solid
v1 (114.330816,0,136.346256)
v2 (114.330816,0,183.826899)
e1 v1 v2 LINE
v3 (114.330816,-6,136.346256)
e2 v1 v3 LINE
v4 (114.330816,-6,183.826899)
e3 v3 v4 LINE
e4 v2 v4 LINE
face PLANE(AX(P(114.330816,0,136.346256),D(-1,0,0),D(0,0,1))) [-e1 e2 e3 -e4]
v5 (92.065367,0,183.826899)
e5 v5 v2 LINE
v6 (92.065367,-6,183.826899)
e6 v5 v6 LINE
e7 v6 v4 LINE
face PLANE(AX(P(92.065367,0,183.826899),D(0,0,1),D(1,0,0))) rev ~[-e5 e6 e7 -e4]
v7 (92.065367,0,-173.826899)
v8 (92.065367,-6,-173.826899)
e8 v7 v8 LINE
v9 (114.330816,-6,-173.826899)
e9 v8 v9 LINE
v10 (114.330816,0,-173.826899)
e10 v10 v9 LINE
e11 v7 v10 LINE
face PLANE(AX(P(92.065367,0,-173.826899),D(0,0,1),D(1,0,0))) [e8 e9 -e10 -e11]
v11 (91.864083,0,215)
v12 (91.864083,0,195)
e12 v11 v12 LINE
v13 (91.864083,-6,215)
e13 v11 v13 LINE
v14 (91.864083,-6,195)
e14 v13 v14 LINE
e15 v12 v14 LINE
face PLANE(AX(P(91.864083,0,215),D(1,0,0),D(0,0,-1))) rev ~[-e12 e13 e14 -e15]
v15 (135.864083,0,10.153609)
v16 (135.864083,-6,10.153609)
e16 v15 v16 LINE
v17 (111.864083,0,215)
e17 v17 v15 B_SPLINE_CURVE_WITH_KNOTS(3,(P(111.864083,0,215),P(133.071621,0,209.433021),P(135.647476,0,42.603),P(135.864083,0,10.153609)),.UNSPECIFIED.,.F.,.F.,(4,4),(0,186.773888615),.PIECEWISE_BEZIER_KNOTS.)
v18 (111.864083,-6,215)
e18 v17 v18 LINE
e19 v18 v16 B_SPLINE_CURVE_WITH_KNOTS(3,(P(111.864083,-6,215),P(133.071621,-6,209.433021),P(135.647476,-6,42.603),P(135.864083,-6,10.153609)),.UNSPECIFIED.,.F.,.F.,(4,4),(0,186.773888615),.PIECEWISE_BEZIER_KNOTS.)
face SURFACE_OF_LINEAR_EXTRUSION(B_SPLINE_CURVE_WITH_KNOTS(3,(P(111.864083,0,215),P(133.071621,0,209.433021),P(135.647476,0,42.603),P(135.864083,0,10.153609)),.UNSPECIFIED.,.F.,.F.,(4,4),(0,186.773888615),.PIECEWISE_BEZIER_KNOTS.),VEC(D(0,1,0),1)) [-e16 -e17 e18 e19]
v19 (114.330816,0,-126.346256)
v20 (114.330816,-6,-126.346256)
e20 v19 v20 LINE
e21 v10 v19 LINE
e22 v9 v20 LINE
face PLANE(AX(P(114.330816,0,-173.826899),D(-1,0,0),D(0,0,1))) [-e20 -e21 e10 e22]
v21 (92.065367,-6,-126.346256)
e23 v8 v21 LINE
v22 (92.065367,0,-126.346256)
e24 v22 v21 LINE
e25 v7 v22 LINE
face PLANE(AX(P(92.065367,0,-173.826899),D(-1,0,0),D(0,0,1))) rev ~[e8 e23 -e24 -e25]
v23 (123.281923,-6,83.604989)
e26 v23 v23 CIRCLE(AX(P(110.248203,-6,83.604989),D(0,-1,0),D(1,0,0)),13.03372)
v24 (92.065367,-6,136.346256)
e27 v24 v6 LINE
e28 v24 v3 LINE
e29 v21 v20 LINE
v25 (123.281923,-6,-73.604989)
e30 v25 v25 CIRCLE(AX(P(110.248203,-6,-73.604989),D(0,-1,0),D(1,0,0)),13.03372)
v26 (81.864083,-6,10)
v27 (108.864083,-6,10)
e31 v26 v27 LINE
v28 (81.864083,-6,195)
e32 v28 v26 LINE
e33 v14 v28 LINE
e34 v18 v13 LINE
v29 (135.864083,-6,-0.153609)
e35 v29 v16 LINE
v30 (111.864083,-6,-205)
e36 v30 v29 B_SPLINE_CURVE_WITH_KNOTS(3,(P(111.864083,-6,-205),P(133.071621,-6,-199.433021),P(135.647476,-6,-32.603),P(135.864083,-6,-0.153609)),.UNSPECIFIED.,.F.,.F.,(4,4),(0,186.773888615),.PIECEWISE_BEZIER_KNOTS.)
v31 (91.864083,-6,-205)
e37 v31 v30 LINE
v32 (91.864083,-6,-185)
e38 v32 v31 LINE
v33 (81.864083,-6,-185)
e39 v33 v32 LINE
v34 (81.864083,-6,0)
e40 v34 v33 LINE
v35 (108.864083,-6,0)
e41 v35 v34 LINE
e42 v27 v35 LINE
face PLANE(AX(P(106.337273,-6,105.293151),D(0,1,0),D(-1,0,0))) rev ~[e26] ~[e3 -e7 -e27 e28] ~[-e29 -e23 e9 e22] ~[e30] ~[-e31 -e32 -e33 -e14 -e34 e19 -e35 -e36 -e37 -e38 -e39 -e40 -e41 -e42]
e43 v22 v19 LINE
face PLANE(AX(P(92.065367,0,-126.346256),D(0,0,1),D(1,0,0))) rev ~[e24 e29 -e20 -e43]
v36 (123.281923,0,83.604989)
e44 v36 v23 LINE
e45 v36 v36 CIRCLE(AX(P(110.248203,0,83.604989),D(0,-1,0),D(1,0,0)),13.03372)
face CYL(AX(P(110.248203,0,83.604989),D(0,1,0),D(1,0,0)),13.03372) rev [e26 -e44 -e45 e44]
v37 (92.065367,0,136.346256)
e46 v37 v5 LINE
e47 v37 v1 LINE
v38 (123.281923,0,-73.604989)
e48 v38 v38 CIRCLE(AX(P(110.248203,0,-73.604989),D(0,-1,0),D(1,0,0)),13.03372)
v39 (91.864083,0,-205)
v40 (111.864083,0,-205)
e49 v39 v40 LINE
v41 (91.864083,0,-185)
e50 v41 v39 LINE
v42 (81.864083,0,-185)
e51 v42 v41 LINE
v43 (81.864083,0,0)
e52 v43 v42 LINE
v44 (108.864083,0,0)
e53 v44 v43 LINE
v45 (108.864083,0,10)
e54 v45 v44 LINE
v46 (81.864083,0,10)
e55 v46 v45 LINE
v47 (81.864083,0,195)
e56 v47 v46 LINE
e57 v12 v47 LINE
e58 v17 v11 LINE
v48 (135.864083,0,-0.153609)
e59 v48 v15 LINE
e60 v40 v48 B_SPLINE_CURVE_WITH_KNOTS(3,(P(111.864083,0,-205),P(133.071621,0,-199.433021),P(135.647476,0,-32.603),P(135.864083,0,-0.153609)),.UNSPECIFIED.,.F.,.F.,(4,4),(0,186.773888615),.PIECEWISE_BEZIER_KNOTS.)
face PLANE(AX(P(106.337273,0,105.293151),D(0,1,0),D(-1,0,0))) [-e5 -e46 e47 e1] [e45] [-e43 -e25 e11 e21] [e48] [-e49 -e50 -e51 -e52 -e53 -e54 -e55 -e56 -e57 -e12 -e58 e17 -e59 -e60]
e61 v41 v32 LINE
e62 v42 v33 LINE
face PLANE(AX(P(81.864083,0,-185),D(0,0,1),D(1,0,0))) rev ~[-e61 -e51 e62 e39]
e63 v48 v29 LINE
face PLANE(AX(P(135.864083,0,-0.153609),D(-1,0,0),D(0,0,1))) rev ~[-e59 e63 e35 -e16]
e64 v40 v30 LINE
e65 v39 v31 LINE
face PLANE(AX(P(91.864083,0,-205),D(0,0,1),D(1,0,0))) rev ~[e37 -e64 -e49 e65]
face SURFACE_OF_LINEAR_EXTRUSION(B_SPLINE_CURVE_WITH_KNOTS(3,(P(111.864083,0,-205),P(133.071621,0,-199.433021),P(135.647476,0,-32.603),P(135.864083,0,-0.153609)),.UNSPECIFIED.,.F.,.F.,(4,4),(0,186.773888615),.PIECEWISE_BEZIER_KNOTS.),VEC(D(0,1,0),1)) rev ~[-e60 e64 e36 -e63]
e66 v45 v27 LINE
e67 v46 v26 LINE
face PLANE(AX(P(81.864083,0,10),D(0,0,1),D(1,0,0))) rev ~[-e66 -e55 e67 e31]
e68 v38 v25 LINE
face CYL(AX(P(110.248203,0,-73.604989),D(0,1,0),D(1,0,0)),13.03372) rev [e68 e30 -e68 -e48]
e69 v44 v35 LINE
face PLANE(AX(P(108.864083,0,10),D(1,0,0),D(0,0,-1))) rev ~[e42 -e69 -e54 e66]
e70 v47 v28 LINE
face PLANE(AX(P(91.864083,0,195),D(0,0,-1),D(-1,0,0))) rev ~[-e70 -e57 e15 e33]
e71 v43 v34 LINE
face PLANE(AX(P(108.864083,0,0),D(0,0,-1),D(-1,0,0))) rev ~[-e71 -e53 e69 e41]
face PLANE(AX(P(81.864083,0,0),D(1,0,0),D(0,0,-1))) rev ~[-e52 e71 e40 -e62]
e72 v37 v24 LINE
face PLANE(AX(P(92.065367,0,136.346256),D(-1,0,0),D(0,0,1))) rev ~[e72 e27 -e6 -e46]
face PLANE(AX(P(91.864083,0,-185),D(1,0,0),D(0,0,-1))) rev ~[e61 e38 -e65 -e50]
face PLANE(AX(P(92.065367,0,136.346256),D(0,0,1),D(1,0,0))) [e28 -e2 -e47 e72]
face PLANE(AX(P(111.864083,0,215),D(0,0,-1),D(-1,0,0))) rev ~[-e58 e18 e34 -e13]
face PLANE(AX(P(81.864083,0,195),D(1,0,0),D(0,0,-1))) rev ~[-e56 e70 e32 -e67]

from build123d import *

# Parameters (mm, degrees)
F0_W     = 22.2654491663
F0_H     = 47.4806427956
F0_R     = 13.033720186
F1_DEPTH = 6


# Not quite as in the source:
# - a feature names something its author has since deleted; it is built from what else it names


with BuildPart() as f1:
    # F0 (on Front) → F1 (new body)
    with BuildSketch(Plane.XZ):
        with BuildLine():
            add(Edge.make_bspline(
                [(111.8640829768, 215), (133.0716213469, 209.4330211779), (135.6474762559, 42.6029998371), (135.8640829768, 10.1536091521)],
                knots=[0, 0, 0, 0, 186.7738886147, 186.7738886147, 186.7738886147, 186.7738886147], degree=3))
            Line((111.8640829768, 215), (91.8640829768, 215))
            Line((91.8640829768, 215), (91.8640829768, 195))
            Line((91.8640829768, 195), (81.8640829768, 195))
            Line((81.8640829768, 195), (81.8640829768, 10))
            Line((81.8640829768, 10), (108.8640829768, 10))
            Line((108.8640829768, 10), (108.8640829768, 5))
            Line((108.8640829768, 5), (135.8640829768, 5))
            Line((135.8640829768, 5), (135.8640829768, 10.1536091521))
        make_face()
        with Locations((103.1980912897, 160.0865775181)):
            Rectangle(F0_W, F0_H, mode=Mode.SUBTRACT)
        with Locations((110.2482031796, 83.6049893333)):
            Circle(F0_R, mode=Mode.SUBTRACT)
        with BuildLine():
            Line((135.8640829768, -0.1536091521), (135.8640829768, 5))
            Line((135.8640829768, 5), (108.8640829768, 5))
            Line((108.8640829768, 5), (108.8640829768, 0))
            Line((108.8640829768, 0), (81.8640829768, 0))
            Line((81.8640829768, 0), (81.8640829768, -185))
            Line((81.8640829768, -185), (91.8640829768, -185))
            Line((91.8640829768, -185), (91.8640829768, -205))
            Line((91.8640829768, -205), (111.8640829768, -205))
            add(Edge.make_bspline(
                [(111.8640829768, -205), (133.0716213469, -199.4330211779), (135.6474762559, -32.6029998371), (135.8640829768, -0.1536091521)],
                knots=[0, 0, 0, 0, 186.7738886147, 186.7738886147, 186.7738886147, 186.7738886147], degree=3))
        make_face()
        with Locations((103.1980912897, -150.0865775181)):
            Rectangle(F0_W, F0_H, mode=Mode.SUBTRACT)
        with Locations((110.2482031796, -73.6049893333)):
            Circle(F0_R, mode=Mode.SUBTRACT)
    extrude(amount=F1_DEPTH)


solid = f1.part
